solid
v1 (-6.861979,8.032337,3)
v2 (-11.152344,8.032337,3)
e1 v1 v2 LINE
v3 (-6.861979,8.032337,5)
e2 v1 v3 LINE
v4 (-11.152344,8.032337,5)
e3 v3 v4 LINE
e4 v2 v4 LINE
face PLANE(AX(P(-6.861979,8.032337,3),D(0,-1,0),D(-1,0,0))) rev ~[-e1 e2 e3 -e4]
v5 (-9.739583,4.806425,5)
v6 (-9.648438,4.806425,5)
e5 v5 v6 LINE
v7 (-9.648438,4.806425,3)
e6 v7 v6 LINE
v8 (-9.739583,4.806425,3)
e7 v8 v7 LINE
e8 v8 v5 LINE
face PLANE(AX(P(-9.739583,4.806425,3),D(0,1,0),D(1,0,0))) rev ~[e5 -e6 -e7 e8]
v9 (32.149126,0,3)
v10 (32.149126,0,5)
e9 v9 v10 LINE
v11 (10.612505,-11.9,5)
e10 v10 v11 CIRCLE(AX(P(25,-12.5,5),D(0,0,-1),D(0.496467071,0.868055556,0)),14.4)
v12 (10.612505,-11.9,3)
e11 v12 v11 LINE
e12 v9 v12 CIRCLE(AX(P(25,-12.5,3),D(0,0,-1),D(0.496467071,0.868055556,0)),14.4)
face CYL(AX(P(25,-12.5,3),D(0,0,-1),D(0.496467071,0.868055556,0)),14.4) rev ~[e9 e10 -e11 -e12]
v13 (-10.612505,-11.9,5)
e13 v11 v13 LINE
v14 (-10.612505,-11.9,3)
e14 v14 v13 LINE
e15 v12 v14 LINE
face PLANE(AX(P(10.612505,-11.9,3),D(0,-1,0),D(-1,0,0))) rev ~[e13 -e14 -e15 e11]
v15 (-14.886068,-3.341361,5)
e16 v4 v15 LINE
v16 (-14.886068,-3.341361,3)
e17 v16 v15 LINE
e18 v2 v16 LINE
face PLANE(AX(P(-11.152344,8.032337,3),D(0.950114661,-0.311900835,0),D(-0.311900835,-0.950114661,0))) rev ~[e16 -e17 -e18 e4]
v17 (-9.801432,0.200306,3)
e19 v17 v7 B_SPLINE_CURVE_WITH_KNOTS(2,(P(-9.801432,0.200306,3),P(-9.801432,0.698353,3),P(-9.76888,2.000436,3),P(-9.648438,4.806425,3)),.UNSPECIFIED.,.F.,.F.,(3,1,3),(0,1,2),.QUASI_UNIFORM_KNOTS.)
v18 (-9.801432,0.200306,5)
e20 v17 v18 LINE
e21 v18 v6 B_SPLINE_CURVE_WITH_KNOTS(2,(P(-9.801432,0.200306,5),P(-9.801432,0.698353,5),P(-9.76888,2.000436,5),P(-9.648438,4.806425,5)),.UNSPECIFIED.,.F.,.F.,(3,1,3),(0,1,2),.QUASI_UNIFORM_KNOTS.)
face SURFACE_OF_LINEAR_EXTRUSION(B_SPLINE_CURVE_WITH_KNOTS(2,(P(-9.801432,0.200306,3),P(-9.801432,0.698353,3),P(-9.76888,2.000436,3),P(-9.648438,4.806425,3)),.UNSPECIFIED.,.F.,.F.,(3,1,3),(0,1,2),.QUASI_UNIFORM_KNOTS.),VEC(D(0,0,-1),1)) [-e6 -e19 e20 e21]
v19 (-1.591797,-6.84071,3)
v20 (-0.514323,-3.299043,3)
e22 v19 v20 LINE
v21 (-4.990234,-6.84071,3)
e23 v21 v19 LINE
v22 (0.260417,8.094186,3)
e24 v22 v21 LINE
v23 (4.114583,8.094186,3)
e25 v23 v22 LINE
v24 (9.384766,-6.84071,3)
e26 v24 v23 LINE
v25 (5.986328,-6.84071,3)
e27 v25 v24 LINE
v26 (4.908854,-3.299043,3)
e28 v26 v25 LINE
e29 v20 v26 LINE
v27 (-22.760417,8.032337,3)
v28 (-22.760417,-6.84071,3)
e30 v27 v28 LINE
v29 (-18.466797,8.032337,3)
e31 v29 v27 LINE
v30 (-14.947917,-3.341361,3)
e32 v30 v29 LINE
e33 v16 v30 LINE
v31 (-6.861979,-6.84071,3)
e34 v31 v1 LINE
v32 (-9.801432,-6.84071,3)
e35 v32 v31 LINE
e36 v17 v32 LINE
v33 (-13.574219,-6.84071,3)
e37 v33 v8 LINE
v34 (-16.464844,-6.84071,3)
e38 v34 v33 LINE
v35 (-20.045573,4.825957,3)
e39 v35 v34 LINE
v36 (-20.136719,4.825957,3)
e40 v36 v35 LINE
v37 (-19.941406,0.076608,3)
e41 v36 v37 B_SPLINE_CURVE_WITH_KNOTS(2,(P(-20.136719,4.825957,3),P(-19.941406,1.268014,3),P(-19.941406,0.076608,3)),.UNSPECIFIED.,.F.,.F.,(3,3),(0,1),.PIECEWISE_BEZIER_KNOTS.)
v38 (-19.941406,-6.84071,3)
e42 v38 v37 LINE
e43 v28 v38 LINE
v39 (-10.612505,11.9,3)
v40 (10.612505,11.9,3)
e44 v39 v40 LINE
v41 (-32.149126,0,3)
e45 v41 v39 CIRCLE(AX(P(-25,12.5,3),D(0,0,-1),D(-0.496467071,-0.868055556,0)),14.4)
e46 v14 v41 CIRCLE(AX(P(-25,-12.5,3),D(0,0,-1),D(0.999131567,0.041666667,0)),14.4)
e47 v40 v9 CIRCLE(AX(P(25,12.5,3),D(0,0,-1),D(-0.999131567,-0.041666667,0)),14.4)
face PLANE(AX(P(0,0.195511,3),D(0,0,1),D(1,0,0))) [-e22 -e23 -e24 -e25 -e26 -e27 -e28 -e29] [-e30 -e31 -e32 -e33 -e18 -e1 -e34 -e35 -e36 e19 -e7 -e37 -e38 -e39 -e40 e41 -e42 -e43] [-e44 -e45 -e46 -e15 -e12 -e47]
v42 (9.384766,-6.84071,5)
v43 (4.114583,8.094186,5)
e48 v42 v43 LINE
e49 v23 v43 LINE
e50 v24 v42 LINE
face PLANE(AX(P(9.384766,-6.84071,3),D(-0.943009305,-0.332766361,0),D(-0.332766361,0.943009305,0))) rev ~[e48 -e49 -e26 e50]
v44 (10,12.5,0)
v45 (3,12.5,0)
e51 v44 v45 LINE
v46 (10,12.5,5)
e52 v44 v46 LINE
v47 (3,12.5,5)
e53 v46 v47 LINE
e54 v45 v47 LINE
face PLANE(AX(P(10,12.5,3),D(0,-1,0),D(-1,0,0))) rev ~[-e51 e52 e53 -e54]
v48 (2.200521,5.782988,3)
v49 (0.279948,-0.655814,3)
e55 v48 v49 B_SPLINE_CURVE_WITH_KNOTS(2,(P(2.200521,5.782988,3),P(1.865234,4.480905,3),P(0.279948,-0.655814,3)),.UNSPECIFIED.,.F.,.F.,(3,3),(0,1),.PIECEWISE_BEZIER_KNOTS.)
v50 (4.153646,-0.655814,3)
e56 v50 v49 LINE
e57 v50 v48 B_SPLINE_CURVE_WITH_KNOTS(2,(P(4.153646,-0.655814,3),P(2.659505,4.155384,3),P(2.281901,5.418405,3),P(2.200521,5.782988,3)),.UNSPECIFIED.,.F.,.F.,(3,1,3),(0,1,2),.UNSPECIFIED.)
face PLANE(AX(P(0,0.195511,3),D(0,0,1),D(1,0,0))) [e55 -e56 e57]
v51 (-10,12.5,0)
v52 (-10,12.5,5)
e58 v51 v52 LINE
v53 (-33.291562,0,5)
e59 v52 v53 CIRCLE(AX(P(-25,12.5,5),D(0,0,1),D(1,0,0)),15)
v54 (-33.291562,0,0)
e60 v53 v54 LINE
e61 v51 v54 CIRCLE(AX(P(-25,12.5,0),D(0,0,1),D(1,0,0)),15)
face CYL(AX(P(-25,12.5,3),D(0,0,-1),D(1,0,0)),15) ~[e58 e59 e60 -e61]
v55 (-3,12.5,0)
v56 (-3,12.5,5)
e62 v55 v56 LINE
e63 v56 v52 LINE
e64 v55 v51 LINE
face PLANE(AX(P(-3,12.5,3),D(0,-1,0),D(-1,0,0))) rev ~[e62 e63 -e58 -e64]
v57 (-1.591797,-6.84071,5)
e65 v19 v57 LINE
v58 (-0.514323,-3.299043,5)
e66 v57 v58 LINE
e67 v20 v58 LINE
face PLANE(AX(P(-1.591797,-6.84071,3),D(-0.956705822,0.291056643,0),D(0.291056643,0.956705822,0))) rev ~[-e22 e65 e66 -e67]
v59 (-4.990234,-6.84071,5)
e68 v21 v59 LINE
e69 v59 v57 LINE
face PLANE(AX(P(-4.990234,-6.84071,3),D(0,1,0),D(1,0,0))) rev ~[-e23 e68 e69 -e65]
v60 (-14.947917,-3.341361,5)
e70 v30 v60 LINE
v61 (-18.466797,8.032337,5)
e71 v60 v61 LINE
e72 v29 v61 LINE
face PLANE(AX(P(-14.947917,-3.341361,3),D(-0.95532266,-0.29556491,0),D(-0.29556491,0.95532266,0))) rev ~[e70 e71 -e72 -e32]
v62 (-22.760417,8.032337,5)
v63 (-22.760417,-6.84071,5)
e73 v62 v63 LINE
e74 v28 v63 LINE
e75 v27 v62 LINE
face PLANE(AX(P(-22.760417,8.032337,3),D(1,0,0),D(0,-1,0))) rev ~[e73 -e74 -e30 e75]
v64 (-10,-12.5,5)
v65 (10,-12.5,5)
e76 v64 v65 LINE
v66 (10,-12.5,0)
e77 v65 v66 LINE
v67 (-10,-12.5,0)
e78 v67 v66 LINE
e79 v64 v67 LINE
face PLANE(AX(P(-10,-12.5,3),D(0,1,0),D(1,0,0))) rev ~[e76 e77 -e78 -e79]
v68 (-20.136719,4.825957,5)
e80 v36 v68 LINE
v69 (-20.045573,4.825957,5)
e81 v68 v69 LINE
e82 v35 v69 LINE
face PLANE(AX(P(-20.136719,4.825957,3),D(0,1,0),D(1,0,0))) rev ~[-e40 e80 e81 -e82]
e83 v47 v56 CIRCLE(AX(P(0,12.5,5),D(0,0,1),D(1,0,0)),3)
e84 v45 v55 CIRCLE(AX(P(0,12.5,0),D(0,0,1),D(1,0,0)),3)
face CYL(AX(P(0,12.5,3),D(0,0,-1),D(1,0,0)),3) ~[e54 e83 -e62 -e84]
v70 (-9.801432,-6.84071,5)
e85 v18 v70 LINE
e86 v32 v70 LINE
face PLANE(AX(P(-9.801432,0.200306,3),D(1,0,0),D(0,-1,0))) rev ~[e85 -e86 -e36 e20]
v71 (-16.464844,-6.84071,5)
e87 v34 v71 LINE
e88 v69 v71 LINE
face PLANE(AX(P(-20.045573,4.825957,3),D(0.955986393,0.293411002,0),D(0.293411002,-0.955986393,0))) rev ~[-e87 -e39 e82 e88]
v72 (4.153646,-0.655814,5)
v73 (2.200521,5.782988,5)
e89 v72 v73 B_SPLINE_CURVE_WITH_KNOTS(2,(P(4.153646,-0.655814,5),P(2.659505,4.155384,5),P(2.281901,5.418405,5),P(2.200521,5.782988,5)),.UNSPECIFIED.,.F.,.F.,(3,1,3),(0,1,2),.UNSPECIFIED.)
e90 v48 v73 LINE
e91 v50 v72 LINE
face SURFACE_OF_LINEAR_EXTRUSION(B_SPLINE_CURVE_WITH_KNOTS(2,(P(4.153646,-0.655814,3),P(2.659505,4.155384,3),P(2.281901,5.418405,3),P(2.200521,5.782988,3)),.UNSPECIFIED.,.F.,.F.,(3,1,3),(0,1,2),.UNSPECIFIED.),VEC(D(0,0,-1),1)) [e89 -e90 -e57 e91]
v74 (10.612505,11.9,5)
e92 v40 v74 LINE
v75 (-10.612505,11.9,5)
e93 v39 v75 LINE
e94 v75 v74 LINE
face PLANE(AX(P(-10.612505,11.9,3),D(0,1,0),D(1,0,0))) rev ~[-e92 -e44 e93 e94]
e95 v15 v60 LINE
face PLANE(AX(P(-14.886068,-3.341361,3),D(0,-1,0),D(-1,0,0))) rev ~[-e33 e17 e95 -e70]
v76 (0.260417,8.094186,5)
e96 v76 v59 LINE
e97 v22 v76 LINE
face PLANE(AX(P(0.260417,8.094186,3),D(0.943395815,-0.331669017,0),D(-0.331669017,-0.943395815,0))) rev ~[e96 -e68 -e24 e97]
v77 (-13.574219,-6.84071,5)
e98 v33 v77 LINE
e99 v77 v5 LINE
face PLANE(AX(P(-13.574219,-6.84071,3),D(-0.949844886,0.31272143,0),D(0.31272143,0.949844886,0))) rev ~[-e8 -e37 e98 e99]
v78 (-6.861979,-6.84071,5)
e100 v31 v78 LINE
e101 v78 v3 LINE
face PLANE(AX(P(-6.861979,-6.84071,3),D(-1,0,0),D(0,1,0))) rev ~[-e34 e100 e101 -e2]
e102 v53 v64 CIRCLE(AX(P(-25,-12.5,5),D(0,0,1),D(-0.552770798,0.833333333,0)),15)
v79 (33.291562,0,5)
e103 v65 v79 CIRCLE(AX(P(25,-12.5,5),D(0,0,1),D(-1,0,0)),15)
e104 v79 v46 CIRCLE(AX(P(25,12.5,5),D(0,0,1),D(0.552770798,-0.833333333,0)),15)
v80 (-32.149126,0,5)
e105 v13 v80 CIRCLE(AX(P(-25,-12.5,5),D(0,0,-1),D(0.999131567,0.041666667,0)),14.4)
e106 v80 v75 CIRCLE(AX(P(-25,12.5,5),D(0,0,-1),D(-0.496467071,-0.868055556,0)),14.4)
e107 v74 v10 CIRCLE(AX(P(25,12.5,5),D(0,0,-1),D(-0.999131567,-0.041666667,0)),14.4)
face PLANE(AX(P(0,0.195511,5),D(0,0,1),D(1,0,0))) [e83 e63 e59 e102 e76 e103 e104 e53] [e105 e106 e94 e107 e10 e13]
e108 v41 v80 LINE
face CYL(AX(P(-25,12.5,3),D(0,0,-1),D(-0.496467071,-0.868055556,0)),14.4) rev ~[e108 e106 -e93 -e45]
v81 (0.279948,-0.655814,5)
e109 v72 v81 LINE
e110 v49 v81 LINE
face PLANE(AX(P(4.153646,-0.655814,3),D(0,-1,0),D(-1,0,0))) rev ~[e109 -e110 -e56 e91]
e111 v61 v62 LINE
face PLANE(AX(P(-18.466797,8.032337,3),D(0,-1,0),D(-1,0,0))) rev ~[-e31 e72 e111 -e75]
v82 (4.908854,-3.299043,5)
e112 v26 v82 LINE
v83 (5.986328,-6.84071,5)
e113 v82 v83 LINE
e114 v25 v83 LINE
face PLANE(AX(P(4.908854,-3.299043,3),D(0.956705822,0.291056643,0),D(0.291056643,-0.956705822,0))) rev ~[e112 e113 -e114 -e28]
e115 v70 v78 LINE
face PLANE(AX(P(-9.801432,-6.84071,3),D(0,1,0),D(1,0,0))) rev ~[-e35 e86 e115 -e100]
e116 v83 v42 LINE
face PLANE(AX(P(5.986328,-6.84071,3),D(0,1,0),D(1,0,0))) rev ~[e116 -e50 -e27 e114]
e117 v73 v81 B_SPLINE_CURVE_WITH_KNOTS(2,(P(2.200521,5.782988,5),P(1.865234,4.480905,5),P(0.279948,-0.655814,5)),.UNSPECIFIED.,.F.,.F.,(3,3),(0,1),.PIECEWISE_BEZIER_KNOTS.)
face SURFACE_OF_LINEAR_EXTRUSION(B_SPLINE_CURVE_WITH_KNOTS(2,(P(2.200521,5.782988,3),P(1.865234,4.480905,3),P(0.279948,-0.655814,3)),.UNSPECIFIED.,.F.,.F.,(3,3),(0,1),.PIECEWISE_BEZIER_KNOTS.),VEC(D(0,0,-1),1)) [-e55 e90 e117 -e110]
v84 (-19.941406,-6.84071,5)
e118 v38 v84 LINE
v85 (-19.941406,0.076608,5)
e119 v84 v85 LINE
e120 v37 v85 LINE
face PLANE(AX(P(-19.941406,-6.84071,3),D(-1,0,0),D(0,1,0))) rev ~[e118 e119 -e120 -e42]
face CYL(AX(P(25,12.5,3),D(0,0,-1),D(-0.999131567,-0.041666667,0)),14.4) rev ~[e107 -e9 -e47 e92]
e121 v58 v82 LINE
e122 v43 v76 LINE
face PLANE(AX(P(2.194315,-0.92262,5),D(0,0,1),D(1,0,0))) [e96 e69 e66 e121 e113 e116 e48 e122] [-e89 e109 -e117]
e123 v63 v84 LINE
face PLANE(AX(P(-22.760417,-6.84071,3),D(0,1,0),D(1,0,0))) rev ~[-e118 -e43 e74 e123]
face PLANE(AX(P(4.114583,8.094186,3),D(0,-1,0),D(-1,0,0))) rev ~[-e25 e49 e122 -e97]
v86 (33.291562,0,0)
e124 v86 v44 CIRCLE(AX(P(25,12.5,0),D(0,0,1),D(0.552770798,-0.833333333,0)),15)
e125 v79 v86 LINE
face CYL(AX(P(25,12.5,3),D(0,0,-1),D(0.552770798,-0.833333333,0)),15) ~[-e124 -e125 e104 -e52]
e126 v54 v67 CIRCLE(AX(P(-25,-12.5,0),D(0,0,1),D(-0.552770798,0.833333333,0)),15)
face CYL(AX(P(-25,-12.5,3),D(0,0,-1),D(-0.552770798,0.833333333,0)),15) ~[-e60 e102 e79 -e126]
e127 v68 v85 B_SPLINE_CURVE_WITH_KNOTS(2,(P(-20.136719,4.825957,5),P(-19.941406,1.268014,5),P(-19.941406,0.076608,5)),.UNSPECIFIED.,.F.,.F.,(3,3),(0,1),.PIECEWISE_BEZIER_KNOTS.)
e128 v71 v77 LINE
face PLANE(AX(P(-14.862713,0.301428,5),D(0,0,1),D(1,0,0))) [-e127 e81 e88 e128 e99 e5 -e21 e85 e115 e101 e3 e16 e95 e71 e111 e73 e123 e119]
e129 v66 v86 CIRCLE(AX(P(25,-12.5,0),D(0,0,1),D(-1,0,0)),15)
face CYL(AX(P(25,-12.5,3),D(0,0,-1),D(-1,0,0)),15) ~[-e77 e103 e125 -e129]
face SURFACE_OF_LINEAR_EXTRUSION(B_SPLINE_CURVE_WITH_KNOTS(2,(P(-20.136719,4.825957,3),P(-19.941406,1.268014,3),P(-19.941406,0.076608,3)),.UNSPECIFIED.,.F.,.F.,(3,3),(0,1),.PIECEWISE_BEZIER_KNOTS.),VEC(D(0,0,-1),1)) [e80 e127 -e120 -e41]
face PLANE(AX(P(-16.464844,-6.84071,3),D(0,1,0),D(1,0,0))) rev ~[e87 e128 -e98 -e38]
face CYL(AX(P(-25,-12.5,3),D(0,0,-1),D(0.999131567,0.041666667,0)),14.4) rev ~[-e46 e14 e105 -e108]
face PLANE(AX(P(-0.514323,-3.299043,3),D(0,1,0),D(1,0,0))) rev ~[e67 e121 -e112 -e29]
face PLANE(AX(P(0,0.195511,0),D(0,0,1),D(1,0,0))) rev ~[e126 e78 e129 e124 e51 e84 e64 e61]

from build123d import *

# Parameters (mm, degrees)
F1_DEPTH = 3
F3_DEPTH = 2
F5_DEPTH = 2
F6_DEPTH = 2


# Not quite as in the source:
# - a feature of the source that left no trace in its solid (it failed there, or was rolled back) is left out


with BuildPart() as f1:
    # F0 (on Top) → F1 (new body)
    with BuildSketch(Plane.XY):
        with BuildLine():
            Line((-3, 12.5), (-10, 12.5))
            ThreePointArc((-10, 12.5), (-32.0931858273, 25.7169101843), (-33.2915619759, 0))
            ThreePointArc((-33.2915619759, 0), (-32.0931858273, -25.7169101843), (-10, -12.5))
            Line((-10, -12.5), (10, -12.5))
            ThreePointArc((10, -12.5), (32.0931858273, -25.7169101843), (33.2915619759, 0))
            ThreePointArc((33.2915619759, 0), (32.0931858273, 25.7169101843), (10, 12.5))
            Line((10, 12.5), (3, 12.5))
            ThreePointArc((3, 12.5), (0, 15.5), (-3, 12.5))
        make_face()
    extrude(amount=F1_DEPTH)

    # F2 (on face) → F3 (join)
    with BuildSketch(Plane.XY.offset(3)):
        with BuildLine():
            ThreePointArc((33.2915619759, 0), (32.0931858273, 25.7169101843), (10, 12.5))
            Line((10, 12.5), (3, 12.5))
            ThreePointArc((3, 12.5), (0, 15.5), (-3, 12.5))
            Line((-3, 12.5), (-10, 12.5))
            ThreePointArc((-10, 12.5), (-32.0931858273, 25.7169101843), (-33.2915619759, 0))
            ThreePointArc((-33.2915619759, 0), (-32.0931858273, -25.7169101843), (-10, -12.5))
            Line((-10, -12.5), (10, -12.5))
            ThreePointArc((10, -12.5), (32.0931858273, -25.7169101843), (33.2915619759, 0))
        make_face()
        with BuildLine():
            ThreePointArc((-10.6125054301, -11.9), (-31.9642656137, -25.1039281362), (-32.1491258207, 0))
            ThreePointArc((-32.1491258207, 0), (-31.9642656137, 25.1039281362), (-10.6125054301, 11.9))
            Line((-10.6125054301, 11.9), (0, 11.9))
            Line((0, 11.9), (10.6125054301, 11.9))
            ThreePointArc((10.6125054301, 11.9), (31.9642656137, 25.1039281362), (32.1491258207, 0))
            ThreePointArc((32.1491258207, 0), (31.9642656137, -25.1039281362), (10.6125054301, -11.9))
            Line((10.6125054301, -11.9), (-10.6125054301, -11.9))
        make_face(mode=Mode.SUBTRACT)
    extrude(amount=F3_DEPTH)

    # F4 (on face) → F5 (join)
    with BuildSketch(Plane.XY.offset(3)):
        with BuildLine():
            Line((-20.0455729167, 4.8259567143), (-16.46484375, -6.8407099524))
            Line((-16.46484375, -6.8407099524), (-13.57421875, -6.8407099524))
            Line((-13.57421875, -6.8407099524), (-9.7395833333, 4.8064254643))
            Line((-9.7395833333, 4.8064254643), (-9.6484375, 4.8064254643))
            add(Edge.make_bspline(
                [(-9.78515625, 1.3493942143), (-9.7688802083, 2.000435881), (-9.6484375, 4.8064254643)],
                knots=[0, 0, 0, 1, 1, 1], degree=2))
            add(Edge.make_bspline(
                [(-9.8014322917, 0.2003056726), (-9.8014322917, 0.6983525476), (-9.78515625, 1.3493942143)],
                knots=[0, 0, 0, 1, 1, 1], degree=2))
            Line((-9.8014322917, 0.2003056726), (-9.8014322917, -6.8407099524))
            Line((-9.8014322917, -6.8407099524), (-6.8619791667, -6.8407099524))
            Line((-6.8619791667, -6.8407099524), (-6.8619791667, 8.0323369226))
            Line((-6.8619791667, 8.0323369226), (-11.15234375, 8.0323369226))
            Line((-11.15234375, 8.0323369226), (-14.8860677083, -3.341360994))
            Line((-14.8860677083, -3.341360994), (-14.9479166667, -3.341360994))
            Line((-14.9479166667, -3.341360994), (-18.466796875, 8.0323369226))
            Line((-18.466796875, 8.0323369226), (-22.7604166667, 8.0323369226))
            Line((-22.7604166667, 8.0323369226), (-22.7604166667, -6.8407099524))
            Line((-22.7604166667, -6.8407099524), (-19.94140625, -6.8407099524))
            Line((-19.94140625, -6.8407099524), (-19.94140625, 0.076607756))
            add(Edge.make_bspline(
                [(-20.13671875, 4.8259567143), (-19.94140625, 1.268014006), (-19.94140625, 0.076607756)],
                knots=[0, 0, 0, 1, 1, 1], degree=2))
            Line((-20.13671875, 4.8259567143), (-20.0455729167, 4.8259567143))
        make_face()
    extrude(amount=F5_DEPTH)

    # F4 (on face) → F6 (join)
    with BuildSketch(Plane.XY.offset(3)):
        Polygon((4.9088541667, -3.2990432857), (5.986328125, -6.8407099524), (9.384765625, -6.8407099524), (4.1145833333, 8.094185881), (0.2604166667, 8.094185881), (-4.990234375, -6.8407099524), (-1.591796875, -6.8407099524), (-0.5143229167, -3.2990432857), align=None)
        with BuildLine():
            add(Edge.make_bspline(
                [(4.1536458333, -0.655814119), (2.6595052083, 4.1553837976), (2.470703125, 4.7868942143)],
                knots=[0, 0, 0, 1, 1, 1], degree=2))
            Line((4.1536458333, -0.655814119), (0.2799479167, -0.655814119))
            add(Edge.make_bspline(
                [(2.2005208333, 5.7829879643), (1.865234375, 4.480904631), (0.2799479167, -0.655814119)],
                knots=[0, 0, 0, 1, 1, 1], degree=2))
            add(Edge.make_bspline(
                [(2.470703125, 4.7868942143), (2.2819010417, 5.418404631), (2.2005208333, 5.7829879643)],
                knots=[0, 0, 0, 1, 1, 1], degree=2))
        make_face(mode=Mode.SUBTRACT)
    extrude(amount=F6_DEPTH)


solid = f1.part
